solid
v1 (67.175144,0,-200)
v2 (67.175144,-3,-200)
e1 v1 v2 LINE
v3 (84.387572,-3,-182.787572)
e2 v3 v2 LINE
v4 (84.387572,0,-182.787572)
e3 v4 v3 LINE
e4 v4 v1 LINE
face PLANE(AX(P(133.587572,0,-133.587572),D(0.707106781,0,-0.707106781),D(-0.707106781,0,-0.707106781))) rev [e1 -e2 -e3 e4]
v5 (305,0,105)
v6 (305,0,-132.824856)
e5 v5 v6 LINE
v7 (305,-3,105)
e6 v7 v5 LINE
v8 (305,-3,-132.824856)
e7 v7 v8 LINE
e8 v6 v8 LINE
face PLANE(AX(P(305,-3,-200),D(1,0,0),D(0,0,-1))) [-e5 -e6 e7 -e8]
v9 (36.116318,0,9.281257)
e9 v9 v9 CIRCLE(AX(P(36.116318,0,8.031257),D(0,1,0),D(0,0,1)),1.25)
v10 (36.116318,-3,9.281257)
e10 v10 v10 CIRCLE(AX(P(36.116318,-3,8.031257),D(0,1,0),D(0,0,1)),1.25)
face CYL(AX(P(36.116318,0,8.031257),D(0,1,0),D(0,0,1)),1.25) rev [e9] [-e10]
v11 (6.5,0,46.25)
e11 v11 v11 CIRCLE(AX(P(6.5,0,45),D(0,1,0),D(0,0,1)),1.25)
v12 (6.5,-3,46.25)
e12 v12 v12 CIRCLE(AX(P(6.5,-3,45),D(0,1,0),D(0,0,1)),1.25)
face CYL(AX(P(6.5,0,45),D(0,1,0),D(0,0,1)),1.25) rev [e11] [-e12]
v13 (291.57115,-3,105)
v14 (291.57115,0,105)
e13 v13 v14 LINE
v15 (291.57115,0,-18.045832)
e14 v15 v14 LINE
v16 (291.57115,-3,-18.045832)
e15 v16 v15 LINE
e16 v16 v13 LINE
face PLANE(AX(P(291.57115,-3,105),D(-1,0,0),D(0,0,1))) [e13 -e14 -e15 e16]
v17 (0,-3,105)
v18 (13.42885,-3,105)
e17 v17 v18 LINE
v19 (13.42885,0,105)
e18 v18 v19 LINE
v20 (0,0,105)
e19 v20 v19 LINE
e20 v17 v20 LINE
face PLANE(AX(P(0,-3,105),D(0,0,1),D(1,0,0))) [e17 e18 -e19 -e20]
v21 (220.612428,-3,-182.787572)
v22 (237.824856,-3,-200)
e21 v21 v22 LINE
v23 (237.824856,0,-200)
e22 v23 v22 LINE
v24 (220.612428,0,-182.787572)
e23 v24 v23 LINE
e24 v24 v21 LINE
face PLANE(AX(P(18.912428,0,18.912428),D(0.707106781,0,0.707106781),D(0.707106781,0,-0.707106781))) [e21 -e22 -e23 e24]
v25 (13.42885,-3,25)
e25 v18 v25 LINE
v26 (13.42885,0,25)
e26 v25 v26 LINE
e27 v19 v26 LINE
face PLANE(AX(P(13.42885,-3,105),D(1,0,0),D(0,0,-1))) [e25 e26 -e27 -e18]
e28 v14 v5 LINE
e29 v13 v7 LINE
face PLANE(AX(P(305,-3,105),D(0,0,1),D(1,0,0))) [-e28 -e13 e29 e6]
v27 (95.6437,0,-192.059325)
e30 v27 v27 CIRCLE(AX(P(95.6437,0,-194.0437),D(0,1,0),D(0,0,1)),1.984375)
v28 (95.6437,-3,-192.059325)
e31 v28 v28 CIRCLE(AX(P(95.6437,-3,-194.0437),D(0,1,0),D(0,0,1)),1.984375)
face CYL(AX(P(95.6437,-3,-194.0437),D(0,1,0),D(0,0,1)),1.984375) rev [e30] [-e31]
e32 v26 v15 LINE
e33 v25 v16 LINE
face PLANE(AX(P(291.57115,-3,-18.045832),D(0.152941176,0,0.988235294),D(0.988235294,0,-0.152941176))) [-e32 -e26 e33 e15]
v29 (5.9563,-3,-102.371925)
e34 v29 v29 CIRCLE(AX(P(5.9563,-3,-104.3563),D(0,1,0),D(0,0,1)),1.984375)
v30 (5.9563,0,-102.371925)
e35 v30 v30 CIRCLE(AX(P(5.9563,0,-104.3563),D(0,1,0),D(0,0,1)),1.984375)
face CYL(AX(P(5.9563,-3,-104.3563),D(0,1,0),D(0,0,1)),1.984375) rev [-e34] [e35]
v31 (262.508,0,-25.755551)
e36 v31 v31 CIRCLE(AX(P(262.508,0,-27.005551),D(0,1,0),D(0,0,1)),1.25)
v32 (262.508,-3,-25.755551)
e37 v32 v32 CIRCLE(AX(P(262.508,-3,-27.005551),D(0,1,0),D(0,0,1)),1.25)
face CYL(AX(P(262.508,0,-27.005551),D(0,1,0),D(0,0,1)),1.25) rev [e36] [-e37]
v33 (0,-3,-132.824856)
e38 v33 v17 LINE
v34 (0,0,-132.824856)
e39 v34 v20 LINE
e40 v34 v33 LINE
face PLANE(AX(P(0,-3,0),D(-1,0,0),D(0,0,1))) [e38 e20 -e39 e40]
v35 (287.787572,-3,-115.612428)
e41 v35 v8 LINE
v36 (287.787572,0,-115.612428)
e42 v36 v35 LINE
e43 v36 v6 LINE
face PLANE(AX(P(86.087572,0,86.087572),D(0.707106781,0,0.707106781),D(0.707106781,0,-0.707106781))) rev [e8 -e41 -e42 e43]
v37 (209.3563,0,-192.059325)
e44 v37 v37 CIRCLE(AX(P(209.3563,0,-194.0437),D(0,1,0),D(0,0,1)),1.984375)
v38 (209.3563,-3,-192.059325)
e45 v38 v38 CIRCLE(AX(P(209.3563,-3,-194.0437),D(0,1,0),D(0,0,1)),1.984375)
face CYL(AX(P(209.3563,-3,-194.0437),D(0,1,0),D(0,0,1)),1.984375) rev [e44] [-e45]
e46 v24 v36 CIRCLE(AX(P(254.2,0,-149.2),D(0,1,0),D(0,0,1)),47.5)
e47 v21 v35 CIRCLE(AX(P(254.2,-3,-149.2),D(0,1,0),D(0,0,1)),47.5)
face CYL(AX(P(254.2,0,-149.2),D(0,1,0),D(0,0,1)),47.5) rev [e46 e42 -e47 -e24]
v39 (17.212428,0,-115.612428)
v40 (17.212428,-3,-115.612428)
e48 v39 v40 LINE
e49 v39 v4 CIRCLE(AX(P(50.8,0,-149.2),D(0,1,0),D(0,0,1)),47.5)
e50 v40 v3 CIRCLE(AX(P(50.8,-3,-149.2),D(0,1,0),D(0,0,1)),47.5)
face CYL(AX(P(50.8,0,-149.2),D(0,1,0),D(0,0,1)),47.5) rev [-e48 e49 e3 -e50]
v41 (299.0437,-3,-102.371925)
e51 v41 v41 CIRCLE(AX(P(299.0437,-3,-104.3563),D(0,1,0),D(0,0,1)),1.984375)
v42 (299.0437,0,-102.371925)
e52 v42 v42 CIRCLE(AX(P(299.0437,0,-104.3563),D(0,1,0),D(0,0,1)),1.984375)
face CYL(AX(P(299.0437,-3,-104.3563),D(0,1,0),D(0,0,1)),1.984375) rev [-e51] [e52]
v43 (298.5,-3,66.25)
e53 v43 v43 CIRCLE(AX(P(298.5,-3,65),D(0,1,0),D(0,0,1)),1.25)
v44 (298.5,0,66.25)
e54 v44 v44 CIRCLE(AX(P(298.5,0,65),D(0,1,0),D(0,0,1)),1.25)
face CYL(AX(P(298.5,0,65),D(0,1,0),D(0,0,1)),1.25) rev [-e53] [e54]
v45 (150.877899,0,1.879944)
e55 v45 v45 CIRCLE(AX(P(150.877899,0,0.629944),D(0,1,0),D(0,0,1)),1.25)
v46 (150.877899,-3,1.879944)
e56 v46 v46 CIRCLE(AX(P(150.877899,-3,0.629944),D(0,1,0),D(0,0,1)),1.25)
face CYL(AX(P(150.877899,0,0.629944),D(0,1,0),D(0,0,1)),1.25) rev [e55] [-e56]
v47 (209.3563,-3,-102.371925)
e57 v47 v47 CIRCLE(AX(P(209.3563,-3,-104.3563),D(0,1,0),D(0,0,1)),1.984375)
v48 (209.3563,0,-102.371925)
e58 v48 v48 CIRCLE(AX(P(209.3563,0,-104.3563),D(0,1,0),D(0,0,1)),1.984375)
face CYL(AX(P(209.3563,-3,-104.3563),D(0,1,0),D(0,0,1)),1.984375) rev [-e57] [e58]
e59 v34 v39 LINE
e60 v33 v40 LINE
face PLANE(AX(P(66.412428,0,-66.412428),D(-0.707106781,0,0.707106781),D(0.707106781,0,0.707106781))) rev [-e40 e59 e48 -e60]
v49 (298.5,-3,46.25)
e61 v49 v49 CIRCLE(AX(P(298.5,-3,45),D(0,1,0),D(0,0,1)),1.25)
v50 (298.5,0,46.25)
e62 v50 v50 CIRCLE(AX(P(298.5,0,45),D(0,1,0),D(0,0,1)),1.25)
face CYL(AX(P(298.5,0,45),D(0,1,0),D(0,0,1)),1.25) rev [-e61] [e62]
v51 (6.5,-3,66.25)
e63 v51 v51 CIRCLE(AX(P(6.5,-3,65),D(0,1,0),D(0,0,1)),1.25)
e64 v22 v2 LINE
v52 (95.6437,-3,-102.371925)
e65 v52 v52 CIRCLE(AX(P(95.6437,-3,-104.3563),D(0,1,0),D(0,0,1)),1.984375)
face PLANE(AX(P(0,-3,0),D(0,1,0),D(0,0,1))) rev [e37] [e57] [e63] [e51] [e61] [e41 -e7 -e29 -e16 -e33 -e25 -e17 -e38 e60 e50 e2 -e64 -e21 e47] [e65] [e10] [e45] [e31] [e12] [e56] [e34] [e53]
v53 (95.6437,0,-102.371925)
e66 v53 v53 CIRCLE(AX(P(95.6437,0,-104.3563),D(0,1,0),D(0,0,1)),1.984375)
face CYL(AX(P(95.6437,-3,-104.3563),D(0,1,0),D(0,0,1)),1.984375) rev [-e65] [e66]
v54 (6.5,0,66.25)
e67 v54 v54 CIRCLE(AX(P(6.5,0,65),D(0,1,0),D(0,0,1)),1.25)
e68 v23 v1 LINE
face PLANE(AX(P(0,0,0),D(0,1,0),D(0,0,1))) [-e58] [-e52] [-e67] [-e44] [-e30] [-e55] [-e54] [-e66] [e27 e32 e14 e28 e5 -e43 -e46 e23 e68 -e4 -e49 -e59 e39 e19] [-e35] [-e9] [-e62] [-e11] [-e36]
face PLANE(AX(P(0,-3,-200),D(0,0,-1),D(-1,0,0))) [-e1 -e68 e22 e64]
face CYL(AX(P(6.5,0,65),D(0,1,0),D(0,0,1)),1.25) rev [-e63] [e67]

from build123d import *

# Parameters (mm, degrees)
BASE_FLANGE1_DEPTH    = 3
M3_TAPPED_HOLE1_D     = 2.5
M3_TAPPED_HOLE1_DEPTH = 7.5
M3_TAPPED_HOLE1_TIP   = 0.751075774
M3_TAPPED_HOLE2_D     = 2.5
M3_TAPPED_HOLE2_DEPTH = 7.5
M3_TAPPED_HOLE2_TIP   = 0.751075774
SKETCH11_R            = 47.5
SKETCH11_R_2          = 1.984375
CUT_EXTRUDE1_DEPTH    = 365.73826232


# Sheet-metal steps are written as plain solids
with BuildPart() as part:
    # Sketch1 → Base-Flange1 (new body)
    with BuildSketch(Plane(origin=(0, 0, 0), x_dir=(1, 0, 0), z_dir=(0, 1, 0))):
        Polygon((0, 0), (0, 200), (305, 200), (305, 35.309832976), (305, -105), (291.57115, -105), (291.57115, 18.045832093), (13.42885, -25), (13.42885, -105), (0, -105), align=None)
    extrude(amount=-BASE_FLANGE1_DEPTH)

    # M3 Tapped Hole1
    with Locations(Plane(origin=(0, 0, 0), x_dir=(1, 0, 0), z_dir=(0, 1, 0))):
        with Locations((6.5, -45), (6.5, -65), (298.5, -45), (298.5, -65)):
            Hole(M3_TAPPED_HOLE1_D / 2, depth=M3_TAPPED_HOLE1_DEPTH)
            with Locations((0, 0, -(M3_TAPPED_HOLE1_DEPTH + M3_TAPPED_HOLE1_TIP / 2))):  # 118° drill point
                Cone(0, M3_TAPPED_HOLE1_D / 2, M3_TAPPED_HOLE1_TIP, mode=Mode.SUBTRACT)

    # M3 Tapped Hole2
    with Locations(Plane(origin=(0, 0, 0), x_dir=(1, 0, 0), z_dir=(0, 1, 0))):
        with Locations((36.116318069, -8.031256885), (150.87789947, -0.629943868), (262.508000343, 27.005551046)):
            Hole(M3_TAPPED_HOLE2_D / 2, depth=M3_TAPPED_HOLE2_DEPTH)
            with Locations((0, 0, -(M3_TAPPED_HOLE2_DEPTH + M3_TAPPED_HOLE2_TIP / 2))):  # 118° drill point
                Cone(0, M3_TAPPED_HOLE2_D / 2, M3_TAPPED_HOLE2_TIP, mode=Mode.SUBTRACT)

    # Sketch11 → Cut-Extrude1 (cut, through all)
    with BuildSketch(Plane(origin=(0, 0, 0), x_dir=(1, 0, 0), z_dir=(0, 1, 0))):
        with BuildLine():
            Line((0, 200), (0, 132.824855788))
            Line((0, 132.824855788), (17.212427894, 115.612427894))
            ThreePointArc((17.212427894, 115.612427894), (17.212427894, 182.787572107), (84.387572107, 182.787572107))
            Line((84.387572107, 182.787572107), (67.175144213, 200))
            Line((67.175144213, 200), (0, 200))
        make_face()
        with Locations((50.8, 149.2)):
            Circle(SKETCH11_R)
        with Locations((254.2, 149.2)):
            Circle(SKETCH11_R)
        with BuildLine():
            Line((305, 200), (237.824855787, 200))
            Line((237.824855787, 200), (220.612427894, 182.787572106))
            ThreePointArc((220.612427894, 182.787572106), (272.377463037, 193.084277794), (301.7, 149.2))
            ThreePointArc((301.7, 149.2), (298.084277794, 131.022536963), (287.787572106, 115.612427894))
            Line((287.787572106, 115.612427894), (305, 132.824855787))
            Line((305, 132.824855787), (305, 200))
        make_face()
        with Locations(Location((95.6437, 194.0437, 0), (0, 0, 270))):
            Circle(SKETCH11_R_2)
        with Locations(Location((5.9563, 104.3563, 0), (0, 0, 270))):
            Circle(SKETCH11_R_2)
        with Locations(Location((95.6437, 104.3563, 0), (0, 0, 270))):
            Circle(SKETCH11_R_2)
        with Locations(Location((209.3563, 194.0437, 0), (0, 0, 270))):
            Circle(SKETCH11_R_2)
        with Locations(Location((209.3563, 104.3563, 0), (0, 0, 270))):
            Circle(SKETCH11_R_2)
        with Locations(Location((299.0437, 104.3563, 0), (0, 0, 270))):
            Circle(SKETCH11_R_2)
    extrude(amount=-CUT_EXTRUDE1_DEPTH, mode=Mode.SUBTRACT)


solid = part.part
